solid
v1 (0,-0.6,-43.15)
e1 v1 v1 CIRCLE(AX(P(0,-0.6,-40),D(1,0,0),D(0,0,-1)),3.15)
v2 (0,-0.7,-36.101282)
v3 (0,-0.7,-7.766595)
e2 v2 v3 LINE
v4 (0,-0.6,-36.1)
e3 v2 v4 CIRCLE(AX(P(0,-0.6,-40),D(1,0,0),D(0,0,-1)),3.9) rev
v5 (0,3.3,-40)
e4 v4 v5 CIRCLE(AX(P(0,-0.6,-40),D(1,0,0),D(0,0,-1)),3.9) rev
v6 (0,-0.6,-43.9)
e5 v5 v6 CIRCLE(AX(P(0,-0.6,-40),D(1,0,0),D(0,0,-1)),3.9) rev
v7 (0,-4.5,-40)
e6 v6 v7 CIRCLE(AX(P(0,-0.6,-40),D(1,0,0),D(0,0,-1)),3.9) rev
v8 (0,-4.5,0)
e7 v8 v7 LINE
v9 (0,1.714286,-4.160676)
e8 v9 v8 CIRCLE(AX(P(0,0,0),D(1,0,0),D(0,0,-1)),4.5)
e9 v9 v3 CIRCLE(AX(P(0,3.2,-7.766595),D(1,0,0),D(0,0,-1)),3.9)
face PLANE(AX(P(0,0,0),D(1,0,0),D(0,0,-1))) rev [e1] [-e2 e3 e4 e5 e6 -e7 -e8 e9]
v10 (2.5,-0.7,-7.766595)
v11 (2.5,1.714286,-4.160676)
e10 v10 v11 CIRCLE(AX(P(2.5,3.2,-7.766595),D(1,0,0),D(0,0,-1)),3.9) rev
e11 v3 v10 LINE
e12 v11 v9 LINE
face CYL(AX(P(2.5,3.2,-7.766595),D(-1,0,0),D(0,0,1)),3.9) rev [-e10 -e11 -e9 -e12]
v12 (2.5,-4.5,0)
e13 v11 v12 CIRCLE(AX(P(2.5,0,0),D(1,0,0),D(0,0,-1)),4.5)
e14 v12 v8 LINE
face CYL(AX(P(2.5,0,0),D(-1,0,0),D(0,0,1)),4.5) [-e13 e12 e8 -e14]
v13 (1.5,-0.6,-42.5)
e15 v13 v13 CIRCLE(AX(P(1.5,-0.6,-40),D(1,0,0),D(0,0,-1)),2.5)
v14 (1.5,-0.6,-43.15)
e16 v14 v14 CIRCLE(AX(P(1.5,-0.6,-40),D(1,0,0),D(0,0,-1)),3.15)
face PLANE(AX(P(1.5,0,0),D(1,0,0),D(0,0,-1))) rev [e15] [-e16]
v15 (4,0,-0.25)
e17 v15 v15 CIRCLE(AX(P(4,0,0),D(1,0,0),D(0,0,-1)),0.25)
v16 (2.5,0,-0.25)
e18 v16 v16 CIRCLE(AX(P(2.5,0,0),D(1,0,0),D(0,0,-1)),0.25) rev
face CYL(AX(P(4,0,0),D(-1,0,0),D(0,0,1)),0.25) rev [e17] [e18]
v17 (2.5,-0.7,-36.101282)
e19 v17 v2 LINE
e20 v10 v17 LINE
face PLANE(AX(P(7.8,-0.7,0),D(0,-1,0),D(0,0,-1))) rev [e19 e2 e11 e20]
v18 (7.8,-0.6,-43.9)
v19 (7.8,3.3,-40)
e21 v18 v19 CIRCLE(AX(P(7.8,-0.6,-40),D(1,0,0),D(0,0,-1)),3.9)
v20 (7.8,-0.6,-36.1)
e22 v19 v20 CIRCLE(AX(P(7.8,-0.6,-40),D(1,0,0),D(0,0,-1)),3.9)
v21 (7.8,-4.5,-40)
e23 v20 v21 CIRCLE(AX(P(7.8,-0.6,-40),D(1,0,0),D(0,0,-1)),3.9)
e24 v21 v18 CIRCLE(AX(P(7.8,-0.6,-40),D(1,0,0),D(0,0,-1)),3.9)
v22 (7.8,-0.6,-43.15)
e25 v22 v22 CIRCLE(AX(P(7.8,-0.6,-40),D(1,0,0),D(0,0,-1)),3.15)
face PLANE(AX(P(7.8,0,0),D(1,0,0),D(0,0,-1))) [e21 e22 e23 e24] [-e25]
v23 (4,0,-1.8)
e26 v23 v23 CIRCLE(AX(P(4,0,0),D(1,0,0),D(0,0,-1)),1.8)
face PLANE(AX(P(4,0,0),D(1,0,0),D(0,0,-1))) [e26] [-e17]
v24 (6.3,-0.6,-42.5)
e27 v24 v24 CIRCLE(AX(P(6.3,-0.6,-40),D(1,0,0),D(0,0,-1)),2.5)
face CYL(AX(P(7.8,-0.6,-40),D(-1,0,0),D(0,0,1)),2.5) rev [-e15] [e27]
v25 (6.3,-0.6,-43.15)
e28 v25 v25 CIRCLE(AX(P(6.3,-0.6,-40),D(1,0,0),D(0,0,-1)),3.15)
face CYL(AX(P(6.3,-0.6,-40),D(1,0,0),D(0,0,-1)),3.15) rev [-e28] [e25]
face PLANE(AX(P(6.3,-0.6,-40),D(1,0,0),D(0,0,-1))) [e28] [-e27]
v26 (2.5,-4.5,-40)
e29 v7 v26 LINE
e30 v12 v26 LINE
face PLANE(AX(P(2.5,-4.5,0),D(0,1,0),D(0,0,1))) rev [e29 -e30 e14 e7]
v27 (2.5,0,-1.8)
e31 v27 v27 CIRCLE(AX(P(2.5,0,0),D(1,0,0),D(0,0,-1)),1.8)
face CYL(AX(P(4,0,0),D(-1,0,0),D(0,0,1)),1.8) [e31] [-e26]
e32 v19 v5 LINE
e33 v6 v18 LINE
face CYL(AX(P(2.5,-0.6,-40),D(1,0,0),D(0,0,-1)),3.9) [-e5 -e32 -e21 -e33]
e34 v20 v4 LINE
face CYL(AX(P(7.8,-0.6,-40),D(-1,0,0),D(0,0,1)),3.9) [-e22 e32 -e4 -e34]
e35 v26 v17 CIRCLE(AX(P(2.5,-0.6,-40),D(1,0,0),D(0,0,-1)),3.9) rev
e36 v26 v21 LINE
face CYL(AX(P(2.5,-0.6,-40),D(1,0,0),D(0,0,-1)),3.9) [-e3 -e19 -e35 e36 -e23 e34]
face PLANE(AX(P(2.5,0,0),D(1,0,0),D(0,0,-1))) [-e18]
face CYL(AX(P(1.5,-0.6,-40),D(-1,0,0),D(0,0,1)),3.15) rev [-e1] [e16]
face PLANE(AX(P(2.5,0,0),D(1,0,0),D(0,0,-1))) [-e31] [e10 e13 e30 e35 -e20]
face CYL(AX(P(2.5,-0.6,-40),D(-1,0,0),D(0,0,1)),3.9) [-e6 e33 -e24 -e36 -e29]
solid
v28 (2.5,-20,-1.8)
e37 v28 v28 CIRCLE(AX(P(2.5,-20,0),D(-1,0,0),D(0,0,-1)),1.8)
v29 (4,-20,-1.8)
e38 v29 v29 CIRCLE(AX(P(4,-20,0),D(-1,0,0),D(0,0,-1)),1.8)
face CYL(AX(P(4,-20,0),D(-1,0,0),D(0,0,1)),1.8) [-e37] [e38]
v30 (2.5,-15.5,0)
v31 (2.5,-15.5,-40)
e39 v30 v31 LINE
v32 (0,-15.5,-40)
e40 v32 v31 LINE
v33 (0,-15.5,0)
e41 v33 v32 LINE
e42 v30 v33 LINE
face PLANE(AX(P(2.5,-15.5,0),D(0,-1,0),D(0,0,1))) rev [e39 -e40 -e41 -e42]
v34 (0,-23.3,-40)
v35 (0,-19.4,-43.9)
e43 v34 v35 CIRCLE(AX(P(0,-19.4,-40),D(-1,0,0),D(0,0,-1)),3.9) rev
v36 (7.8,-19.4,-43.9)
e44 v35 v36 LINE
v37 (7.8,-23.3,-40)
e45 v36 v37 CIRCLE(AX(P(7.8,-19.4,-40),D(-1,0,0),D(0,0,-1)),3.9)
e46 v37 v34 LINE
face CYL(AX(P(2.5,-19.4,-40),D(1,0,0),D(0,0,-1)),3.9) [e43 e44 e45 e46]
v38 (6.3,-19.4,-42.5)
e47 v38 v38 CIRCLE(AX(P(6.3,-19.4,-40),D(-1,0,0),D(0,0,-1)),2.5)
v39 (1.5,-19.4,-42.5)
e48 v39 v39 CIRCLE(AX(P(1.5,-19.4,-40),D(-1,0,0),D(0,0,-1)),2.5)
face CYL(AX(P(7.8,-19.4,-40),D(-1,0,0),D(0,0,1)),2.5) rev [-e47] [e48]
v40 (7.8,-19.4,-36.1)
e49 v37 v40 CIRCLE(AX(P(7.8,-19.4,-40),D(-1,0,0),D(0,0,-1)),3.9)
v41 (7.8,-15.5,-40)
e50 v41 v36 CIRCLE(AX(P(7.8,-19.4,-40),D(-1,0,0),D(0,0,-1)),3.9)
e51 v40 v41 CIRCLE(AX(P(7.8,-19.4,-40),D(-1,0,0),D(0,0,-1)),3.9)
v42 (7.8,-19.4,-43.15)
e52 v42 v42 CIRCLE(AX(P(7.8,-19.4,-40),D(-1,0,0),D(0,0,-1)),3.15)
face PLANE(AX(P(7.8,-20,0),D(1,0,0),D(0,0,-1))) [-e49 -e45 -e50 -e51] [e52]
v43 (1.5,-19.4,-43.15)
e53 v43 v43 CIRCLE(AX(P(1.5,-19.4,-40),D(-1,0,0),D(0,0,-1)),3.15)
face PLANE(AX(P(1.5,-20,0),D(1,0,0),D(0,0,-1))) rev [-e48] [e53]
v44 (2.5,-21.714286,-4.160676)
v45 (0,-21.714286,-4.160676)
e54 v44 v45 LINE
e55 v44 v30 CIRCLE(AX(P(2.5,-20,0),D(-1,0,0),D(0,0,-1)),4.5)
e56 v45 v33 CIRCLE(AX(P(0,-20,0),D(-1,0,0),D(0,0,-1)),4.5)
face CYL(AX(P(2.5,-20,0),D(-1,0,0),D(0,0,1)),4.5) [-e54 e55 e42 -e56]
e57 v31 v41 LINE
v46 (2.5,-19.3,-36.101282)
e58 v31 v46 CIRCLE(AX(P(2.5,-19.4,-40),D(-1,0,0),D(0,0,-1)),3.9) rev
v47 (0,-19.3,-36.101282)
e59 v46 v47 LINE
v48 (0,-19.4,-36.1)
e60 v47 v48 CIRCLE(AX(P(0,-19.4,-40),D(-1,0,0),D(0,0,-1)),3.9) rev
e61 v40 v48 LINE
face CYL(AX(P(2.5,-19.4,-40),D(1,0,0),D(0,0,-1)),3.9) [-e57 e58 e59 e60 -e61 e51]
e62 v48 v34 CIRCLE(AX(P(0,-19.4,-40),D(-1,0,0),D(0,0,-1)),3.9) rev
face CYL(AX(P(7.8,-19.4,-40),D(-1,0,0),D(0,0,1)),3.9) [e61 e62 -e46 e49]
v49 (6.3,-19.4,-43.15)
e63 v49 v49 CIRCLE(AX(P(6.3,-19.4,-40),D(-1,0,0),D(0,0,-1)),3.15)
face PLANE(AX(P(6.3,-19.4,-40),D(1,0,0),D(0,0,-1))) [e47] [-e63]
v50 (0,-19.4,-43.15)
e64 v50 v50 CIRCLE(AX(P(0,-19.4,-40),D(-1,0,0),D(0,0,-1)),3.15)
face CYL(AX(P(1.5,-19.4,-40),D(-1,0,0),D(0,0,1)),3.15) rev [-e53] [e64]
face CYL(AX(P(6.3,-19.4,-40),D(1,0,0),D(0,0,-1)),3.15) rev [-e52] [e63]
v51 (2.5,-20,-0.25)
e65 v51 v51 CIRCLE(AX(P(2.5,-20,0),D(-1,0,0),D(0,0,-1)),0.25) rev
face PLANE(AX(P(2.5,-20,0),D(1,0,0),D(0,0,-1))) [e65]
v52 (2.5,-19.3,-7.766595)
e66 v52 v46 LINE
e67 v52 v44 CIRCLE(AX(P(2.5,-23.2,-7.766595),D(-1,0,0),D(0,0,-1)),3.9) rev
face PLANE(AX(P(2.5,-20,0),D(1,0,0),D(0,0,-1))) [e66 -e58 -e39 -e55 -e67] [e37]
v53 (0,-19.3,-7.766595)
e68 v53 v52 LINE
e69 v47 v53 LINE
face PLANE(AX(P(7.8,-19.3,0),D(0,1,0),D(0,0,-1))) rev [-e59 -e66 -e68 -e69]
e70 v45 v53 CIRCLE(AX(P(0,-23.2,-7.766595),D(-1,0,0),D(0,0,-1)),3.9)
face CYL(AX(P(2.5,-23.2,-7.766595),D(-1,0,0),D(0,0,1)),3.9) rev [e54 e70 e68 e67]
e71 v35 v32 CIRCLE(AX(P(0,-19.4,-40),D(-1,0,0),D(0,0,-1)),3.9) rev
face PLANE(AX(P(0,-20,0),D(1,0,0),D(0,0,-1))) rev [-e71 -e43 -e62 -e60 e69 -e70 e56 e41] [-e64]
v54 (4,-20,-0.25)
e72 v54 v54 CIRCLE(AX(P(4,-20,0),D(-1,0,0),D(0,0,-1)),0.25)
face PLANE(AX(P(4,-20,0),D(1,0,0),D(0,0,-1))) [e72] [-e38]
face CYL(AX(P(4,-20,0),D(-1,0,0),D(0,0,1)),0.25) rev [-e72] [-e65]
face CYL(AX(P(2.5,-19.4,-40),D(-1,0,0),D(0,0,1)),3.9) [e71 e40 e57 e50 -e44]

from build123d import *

# Parameters (mm, degrees)
SKETCH_1_R          = 4.5
SKETCH_1_W          = 43.9
SKETCH_1_H          = 7.8
EXTRUDE_1_DEPTH     = 2.5
EXTRUDE_START       = 2.5
SKETCH_1_6_R        = 1.8
SKETCH_1_6_R_2      = 0.25
EXTRUDE_3_DEPTH     = 1.5
SKETCH_1_5_W        = 7.8
SKETCH_1_5_H        = 7.8
EXTRUDE_2_DEPTH     = 7.8
SKETCH_1_7_R        = 2.5
CUT_EXTRUDE_1_DEPTH = 45.814060294
SKETCH_1_8_R        = 3.15
SKETCH_1_8_R_2      = 2.5
CUT_EXTRUDE_2_DEPTH = 1.5
CUT_EXTRUDE_START   = 6.3
SKETCH_1_9_R        = 3.15
SKETCH_1_9_R_2      = 2.5
CUT_EXTRUDE_3_DEPTH = 1.5
CUT_EXTRUDE_4_DEPTH = 45.814060294
FILLET_1_R          = 3.9


with BuildPart() as part:
    # 草图1 → 凸台-拉伸1 (new body)
    with BuildSketch(Plane(origin=(0, 0, 0), x_dir=(0, 0, -1), z_dir=(1, 0, 0))):
        Circle(SKETCH_1_R)
        with Locations((21.95, -0.6)):
            Rectangle(SKETCH_1_W, SKETCH_1_H)
    extrude(amount=EXTRUDE_1_DEPTH)

    # 草图1<6> → 凸台-拉伸3 (add)
    with BuildSketch(Plane(origin=(0, 0, 0), x_dir=(0, 0, -1), z_dir=(1, 0, 0)).offset(EXTRUDE_START)):
        Circle(SKETCH_1_6_R)
        Circle(SKETCH_1_6_R_2, mode=Mode.SUBTRACT)
    extrude(amount=EXTRUDE_3_DEPTH)

    # 草图1<5> → 凸台-拉伸2 (add)
    with BuildSketch(Plane(origin=(0, 0, 0), x_dir=(0, 0, -1), z_dir=(1, 0, 0))):
        with Locations((40, -0.6)):
            Rectangle(SKETCH_1_5_W, SKETCH_1_5_H)
    extrude(amount=EXTRUDE_2_DEPTH)

    # 草图1<7> → 切除-拉伸1 (cut, through all)
    with BuildSketch(Plane(origin=(0, 0, 0), x_dir=(0, 0, -1), z_dir=(1, 0, 0))):
        with Locations((40, -0.6)):
            Circle(SKETCH_1_7_R)
    extrude(amount=CUT_EXTRUDE_1_DEPTH, mode=Mode.SUBTRACT)

    # 草图1<8> → 切除-拉伸2 (cut)
    with BuildSketch(Plane(origin=(0, 0, 0), x_dir=(0, 0, -1), z_dir=(1, 0, 0))):
        with Locations((40, -0.6)):
            Circle(SKETCH_1_8_R)
        with Locations((40, -0.6)):
            Circle(SKETCH_1_8_R_2, mode=Mode.SUBTRACT)
    extrude(amount=CUT_EXTRUDE_2_DEPTH, mode=Mode.SUBTRACT)

    # 草图1<9> → 切除-拉伸3 (cut)
    with BuildSketch(Plane(origin=(0, 0, 0), x_dir=(0, 0, -1), z_dir=(1, 0, 0)).offset(CUT_EXTRUDE_START)):
        with Locations((40, -0.6)):
            Circle(SKETCH_1_9_R)
        with Locations((40, -0.6)):
            Circle(SKETCH_1_9_R_2, mode=Mode.SUBTRACT)
    extrude(amount=CUT_EXTRUDE_3_DEPTH, mode=Mode.SUBTRACT)

    # 草图2 → 切除-拉伸4 (cut, through all)
    with BuildSketch(Plane.ZY):
        Polygon((-4.5, 3.3), (-36.1, 3.3), (-36.1, -0.7), (-4.5, -0.7), (-4.5, 0), align=None)
        with BuildLine():
            Line((-3.059411708, 3.3), (-4.5, 3.3))
            Line((-4.5, 3.3), (-4.5, 0))
            ThreePointArc((-4.5, 0), (-4.124157653, 1.800367645), (-3.059411708, 3.3))
        make_face()
    extrude(amount=-CUT_EXTRUDE_4_DEPTH, mode=Mode.SUBTRACT)

    # 圆角1
    # the kernel refuses this fillet: 3.9 mm, written as the material it adds along each edge
    with BuildSketch(Plane(origin=(0, -0.7, -4.5), x_dir=(0, 0, -1), z_dir=(1, 0, 0))) as fillet_1_piece_1:
        with BuildLine():
            CenterArc((3.266595136, 3.9), FILLET_1_R, 202.392687805, 67.607312195)
            Line((-0.339324035, 2.414285714), (-0.699915952, 2.265714286))
            ThreePointArc((-0.699915952, 2.265714286), (-0.39, 0.7), (-0.39, 0))
            Line((-0.39, 0), (0, -0.39))
            Line((0, -0.39), (3.266595136, -0.39))
            Line((3.266595136, -0.39), (3.266595136, 0))
        make_face()
    extrude(amount=2.5)
    # the kernel refuses this fillet: 3.9 mm, written as the material it takes off along each edge
    with BuildSketch(Plane(origin=(-9.75, -4.5, -43.9), x_dir=(0, 1, 0), z_dir=(1, 0, 0))) as fillet_1_2_piece_1:
        with BuildLine():
            CenterArc((FILLET_1_R, FILLET_1_R), FILLET_1_R, 180, 90)
            Line((0, FILLET_1_R), (0, 0))
            Line((0, 0), (FILLET_1_R, 0))
        make_face()
    extrude(amount=27.3, mode=Mode.SUBTRACT)
    with BuildSketch(Plane(origin=(17.55, 3.3, -43.9), x_dir=(0, 0, 1), z_dir=(-1, 0, 0)), Plane(origin=(17.55, 3.3, -36.1), x_dir=(0, -1, 0), z_dir=(-1, 0, 0))) as fillet_1_2_piece_2:
        with BuildLine():
            CenterArc((FILLET_1_R, -FILLET_1_R), FILLET_1_R, 90, 90)
            Line((0, -FILLET_1_R), (0, 0))
            Line((0, 0), (FILLET_1_R, 0))
        make_face()
    extrude(amount=27.3, mode=Mode.SUBTRACT)
    with BuildSketch(Plane(origin=(-7.25, -4.5, -36.1), x_dir=(0, 1, 0), z_dir=(1, 0, 0))) as fillet_1_2_piece_3_section:
        with BuildLine():
            CenterArc((FILLET_1_R, -FILLET_1_R), FILLET_1_R, 90, 90)
            Line((0, -FILLET_1_R), (0, 0))
            Line((0, 0), (FILLET_1_R, 0))
        make_face()
    fillet_1_2_piece_3 = extrude(amount=24.8, mode=Mode.PRIVATE)
    fillet_1_2_piece_3 = split(fillet_1_2_piece_3, bisect_by=Plane(origin=(1.25, -0.7, -36.100384668), z_dir=(0, 1, 0)), keep=Keep.TOP, mode=Mode.PRIVATE)
    add(fillet_1_2_piece_3, mode=Mode.SUBTRACT)
    with BuildSketch(Plane(origin=(2.5, -4.5, -36.1), x_dir=(0, 1, 0), z_dir=(1, 0, 0))) as fillet_1_2_piece_4:
        with BuildLine():
            CenterArc((FILLET_1_R, -FILLET_1_R), FILLET_1_R, 90, 90)
            Line((0, -FILLET_1_R), (0, 0))
            Line((0, 0), (FILLET_1_R, 0))
        make_face()
    extrude(amount=15.05, mode=Mode.SUBTRACT)


with BuildPart() as body_2:
    # 镜向2: mirrored copy
    add(part.part.mirror(Plane.ZX.offset(-10)))


solid = Compound([part.part, body_2.part])
